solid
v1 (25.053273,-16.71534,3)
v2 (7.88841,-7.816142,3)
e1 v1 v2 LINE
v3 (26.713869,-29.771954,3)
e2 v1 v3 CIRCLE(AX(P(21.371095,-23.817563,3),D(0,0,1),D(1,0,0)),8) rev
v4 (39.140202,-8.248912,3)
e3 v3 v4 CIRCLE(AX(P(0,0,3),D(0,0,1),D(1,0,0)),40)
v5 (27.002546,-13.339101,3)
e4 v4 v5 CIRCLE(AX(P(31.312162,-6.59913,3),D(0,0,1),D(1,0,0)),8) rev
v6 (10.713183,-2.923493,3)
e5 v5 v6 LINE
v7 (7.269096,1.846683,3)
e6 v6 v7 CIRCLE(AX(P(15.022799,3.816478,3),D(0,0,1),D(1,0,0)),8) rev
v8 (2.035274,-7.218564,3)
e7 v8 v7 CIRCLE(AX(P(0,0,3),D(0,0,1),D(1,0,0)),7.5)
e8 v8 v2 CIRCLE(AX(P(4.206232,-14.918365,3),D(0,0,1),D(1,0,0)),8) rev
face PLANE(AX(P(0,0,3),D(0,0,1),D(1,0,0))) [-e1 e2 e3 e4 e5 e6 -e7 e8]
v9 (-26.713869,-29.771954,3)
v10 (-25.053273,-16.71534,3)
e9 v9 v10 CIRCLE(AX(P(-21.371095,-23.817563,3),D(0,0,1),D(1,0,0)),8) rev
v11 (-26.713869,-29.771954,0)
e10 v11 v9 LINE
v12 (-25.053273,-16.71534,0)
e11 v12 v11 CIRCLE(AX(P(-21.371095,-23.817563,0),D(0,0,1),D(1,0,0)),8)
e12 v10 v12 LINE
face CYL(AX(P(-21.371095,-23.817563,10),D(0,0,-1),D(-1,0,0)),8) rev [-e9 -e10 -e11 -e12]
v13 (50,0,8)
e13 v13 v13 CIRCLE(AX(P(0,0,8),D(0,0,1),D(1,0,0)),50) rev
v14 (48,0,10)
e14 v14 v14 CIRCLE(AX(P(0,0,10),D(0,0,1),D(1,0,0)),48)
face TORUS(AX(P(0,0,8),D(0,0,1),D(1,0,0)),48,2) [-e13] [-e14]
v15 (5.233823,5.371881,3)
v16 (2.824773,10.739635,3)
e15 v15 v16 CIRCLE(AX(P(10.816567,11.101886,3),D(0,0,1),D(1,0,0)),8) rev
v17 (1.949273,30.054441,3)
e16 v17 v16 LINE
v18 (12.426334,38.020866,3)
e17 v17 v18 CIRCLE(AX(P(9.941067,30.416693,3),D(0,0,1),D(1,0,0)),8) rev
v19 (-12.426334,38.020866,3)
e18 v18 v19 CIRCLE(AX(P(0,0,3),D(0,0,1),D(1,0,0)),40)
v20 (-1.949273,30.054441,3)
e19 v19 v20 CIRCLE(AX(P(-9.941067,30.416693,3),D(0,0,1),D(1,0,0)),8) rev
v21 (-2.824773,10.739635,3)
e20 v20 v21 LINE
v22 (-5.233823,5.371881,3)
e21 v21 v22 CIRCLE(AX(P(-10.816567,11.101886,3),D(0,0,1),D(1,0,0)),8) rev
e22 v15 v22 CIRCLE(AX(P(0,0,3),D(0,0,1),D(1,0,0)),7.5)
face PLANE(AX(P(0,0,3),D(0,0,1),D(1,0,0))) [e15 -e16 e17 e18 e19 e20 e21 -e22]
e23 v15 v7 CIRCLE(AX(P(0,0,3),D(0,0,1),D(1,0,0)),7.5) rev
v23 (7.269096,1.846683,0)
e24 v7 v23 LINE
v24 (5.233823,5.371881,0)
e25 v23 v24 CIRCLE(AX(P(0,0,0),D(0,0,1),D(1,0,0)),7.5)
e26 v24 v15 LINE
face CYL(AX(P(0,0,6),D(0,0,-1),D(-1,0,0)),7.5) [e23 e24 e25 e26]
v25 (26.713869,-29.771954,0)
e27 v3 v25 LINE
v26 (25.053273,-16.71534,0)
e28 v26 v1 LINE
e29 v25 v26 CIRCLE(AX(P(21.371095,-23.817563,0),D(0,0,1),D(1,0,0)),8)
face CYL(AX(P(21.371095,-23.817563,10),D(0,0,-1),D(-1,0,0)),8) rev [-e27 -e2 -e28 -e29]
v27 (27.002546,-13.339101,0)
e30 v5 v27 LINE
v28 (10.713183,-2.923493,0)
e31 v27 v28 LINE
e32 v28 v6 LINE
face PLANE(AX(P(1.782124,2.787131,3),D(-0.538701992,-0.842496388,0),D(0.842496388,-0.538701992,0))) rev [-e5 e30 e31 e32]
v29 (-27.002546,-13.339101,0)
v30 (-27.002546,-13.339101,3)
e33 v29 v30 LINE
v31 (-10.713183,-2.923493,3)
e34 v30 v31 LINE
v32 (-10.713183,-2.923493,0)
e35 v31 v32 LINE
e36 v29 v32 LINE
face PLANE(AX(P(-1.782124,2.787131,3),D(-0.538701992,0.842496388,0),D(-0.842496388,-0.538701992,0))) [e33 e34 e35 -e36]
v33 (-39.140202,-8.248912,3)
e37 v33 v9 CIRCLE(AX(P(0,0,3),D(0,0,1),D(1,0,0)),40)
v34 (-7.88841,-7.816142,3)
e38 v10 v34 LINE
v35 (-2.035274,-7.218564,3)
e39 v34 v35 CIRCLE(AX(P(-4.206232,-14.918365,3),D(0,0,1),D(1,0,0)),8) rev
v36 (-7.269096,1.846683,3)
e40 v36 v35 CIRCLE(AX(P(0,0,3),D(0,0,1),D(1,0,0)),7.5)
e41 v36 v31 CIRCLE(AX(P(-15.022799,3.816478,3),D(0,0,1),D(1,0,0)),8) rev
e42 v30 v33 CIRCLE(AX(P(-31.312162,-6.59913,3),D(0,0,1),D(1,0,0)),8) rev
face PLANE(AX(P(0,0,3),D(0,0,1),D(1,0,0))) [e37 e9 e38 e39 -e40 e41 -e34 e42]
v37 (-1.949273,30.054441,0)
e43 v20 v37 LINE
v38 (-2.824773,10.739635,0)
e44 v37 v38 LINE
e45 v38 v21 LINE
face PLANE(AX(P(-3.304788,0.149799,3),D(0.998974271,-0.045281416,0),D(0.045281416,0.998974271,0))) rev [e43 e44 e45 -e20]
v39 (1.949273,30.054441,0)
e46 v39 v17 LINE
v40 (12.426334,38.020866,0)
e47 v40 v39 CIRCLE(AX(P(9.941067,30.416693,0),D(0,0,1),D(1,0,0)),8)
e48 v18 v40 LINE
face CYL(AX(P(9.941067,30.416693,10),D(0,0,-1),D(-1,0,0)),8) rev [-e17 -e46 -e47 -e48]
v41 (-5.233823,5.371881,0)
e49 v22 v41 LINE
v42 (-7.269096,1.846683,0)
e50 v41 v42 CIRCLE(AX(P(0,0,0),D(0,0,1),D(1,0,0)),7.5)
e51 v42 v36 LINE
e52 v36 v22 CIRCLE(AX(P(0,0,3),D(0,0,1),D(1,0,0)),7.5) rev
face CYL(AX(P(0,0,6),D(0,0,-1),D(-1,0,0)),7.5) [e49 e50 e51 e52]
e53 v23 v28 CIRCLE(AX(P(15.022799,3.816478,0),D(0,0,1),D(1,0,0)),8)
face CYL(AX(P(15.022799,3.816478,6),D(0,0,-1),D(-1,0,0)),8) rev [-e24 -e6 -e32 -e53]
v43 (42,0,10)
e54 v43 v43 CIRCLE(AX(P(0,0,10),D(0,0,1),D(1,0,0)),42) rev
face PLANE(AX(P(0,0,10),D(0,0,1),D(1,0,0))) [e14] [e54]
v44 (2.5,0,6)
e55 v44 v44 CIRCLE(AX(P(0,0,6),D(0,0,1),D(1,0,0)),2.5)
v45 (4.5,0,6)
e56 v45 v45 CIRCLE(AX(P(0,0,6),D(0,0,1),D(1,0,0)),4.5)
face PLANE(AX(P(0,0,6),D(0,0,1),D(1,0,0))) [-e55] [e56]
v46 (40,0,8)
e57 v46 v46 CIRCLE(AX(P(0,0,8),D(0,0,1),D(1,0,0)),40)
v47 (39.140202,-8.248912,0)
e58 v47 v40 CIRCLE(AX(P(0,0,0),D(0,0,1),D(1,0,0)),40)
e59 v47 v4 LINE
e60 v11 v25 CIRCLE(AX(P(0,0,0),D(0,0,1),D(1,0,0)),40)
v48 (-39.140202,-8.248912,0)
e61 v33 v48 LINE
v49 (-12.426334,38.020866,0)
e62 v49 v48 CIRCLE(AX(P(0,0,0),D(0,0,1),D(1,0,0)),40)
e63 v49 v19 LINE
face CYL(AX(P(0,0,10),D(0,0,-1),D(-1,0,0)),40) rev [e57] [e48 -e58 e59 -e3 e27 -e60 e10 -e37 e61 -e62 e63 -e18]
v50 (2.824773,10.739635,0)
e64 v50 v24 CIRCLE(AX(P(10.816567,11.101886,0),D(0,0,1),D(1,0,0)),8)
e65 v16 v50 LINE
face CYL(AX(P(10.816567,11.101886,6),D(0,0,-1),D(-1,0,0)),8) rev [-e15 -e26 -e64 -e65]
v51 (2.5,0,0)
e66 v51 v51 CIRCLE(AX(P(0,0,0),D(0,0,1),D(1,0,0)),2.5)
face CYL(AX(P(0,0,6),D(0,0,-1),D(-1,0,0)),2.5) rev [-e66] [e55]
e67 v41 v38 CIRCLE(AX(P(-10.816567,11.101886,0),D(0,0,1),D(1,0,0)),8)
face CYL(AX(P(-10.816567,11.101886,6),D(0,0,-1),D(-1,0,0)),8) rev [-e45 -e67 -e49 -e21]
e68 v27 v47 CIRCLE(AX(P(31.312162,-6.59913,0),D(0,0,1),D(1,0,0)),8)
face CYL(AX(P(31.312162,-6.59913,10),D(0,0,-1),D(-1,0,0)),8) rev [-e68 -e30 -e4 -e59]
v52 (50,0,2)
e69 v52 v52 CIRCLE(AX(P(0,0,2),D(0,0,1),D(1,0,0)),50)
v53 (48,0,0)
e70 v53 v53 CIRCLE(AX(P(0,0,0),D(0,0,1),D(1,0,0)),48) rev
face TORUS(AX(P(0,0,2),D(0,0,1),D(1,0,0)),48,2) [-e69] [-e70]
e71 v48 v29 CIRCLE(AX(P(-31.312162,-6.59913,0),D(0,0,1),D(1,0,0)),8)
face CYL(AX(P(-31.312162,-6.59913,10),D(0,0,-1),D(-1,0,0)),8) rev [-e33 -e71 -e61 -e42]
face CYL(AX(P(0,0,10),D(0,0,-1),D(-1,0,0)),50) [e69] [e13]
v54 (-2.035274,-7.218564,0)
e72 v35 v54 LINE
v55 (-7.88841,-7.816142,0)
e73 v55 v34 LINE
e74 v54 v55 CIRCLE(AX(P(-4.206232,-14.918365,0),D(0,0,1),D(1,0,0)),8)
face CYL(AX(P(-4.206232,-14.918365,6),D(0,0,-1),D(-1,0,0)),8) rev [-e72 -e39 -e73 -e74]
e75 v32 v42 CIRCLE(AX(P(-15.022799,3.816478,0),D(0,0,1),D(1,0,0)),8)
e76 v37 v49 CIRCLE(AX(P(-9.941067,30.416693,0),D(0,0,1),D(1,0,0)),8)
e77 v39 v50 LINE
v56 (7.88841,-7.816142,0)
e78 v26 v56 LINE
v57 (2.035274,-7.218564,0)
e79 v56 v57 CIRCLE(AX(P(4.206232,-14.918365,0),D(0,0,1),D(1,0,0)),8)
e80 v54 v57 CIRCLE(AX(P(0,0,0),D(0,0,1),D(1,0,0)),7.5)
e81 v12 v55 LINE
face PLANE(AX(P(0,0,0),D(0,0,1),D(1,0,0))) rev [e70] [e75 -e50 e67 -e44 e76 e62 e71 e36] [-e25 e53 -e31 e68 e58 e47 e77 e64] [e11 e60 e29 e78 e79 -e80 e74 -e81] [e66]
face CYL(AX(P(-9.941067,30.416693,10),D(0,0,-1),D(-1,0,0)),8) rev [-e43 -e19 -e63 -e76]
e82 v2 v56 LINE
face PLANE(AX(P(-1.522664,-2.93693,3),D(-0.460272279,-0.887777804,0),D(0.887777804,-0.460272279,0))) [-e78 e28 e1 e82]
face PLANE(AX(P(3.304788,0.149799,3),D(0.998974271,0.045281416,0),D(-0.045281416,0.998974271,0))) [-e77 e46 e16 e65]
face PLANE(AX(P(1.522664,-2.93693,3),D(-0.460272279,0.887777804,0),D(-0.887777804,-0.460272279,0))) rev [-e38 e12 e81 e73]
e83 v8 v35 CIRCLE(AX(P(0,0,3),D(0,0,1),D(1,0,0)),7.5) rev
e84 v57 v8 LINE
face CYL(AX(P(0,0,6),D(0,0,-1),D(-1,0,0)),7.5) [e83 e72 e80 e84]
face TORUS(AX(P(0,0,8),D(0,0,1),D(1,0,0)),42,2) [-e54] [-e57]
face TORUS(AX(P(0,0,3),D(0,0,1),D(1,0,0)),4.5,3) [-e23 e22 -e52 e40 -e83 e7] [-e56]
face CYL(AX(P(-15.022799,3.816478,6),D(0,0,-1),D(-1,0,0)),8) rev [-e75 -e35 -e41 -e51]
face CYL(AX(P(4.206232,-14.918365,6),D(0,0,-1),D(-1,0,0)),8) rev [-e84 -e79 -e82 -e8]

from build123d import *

# Parameters (mm, degrees)
SKETCH1_R           = 50
SKETCH1_R_2         = 40
EXTRUDE_THIN1_DEPTH = 10
SKETCH2_R           = 7.5
SKETCH2_R_2         = 2.5
BOSS_EXTRUDE1_DEPTH = 6
BOSS_EXTRUDE4_DEPTH = 3
FILLET4_R           = 8
FILLET2_R           = 3
FILLET3_R           = 2


# Some blends are built 0.0001 mm under size
with BuildPart() as part:
    # Sketch1 → Extrude-Thin1 (new body)
    with BuildSketch(Plane.XY):
        Circle(SKETCH1_R)
        Circle(SKETCH1_R_2, mode=Mode.SUBTRACT)
    extrude(amount=EXTRUDE_THIN1_DEPTH)



with BuildPart() as body_2:
    # Sketch2 → Boss-Extrude1 (new body)
    with BuildSketch(Plane.XY):
        Circle(SKETCH2_R)
        Circle(SKETCH2_R_2, mode=Mode.SUBTRACT)
    extrude(amount=BOSS_EXTRUDE1_DEPTH)


with BuildPart() as part_1:
    add(part.part)

    add(body_2.part)  # Boss-Extrude4 merges body 2
    # Sketch3 → Boss-Extrude4 (add)
    with BuildSketch(Plane.XY):
        with BuildLine():
            ThreePointArc((-3, 6.873863542), (-1.532322328, 7.341797347), (0, 7.5))
            Line((0, 7.5), (0, 40))
            ThreePointArc((0, 40), (-0.75, 39.992968132), (-1.499736305, 39.971875))
            Line((-1.499736305, 39.971875), (-3, 6.873863542))
        make_face()
        with BuildLine():
            Line((0, 40), (0, 7.5))
            ThreePointArc((0, 7.5), (1.532322328, 7.341797347), (3, 6.873863542))
            Line((3, 6.873863542), (1.499736305, 39.971875))
            ThreePointArc((1.499736305, 39.971875), (0.75, 39.992968132), (0, 40))
        make_face()
        with BuildLine():
            Line((4.45294045, -6.035007983), (33.866791034, -21.284747239))
            ThreePointArc((33.866791034, -21.284747239), (34.641016151, -20), (35.366527339, -18.687127761))
            Line((35.366527339, -18.687127761), (7.45294045, -0.83885556))
            ThreePointArc((7.45294045, -0.83885556), (6.495190528, -3.75), (4.45294045, -6.035007983))
        make_face()
        with BuildLine():
            ThreePointArc((-35.366527339, -18.687127761), (-34.641016151, -20), (-33.866791034, -21.284747239))
            Line((-33.866791034, -21.284747239), (-4.45294045, -6.035007983))
            ThreePointArc((-4.45294045, -6.035007983), (-6.495190528, -3.75), (-7.45294045, -0.83885556))
            Line((-7.45294045, -0.83885556), (-35.366527339, -18.687127761))
        make_face()
    extrude(amount=BOSS_EXTRUDE4_DEPTH)

    # Fillet4
    # the kernel refuses this fillet: 8 mm, written as the material it adds along each edge
    with BuildSketch(Plane(origin=(-3, 6.873863542, 0), x_dir=(-0.829854636614874, -0.5579796430774114, 0), z_dir=(0, 0, 1)), Plane(origin=(7.45294045, -0.83885556, 0), x_dir=(-0.06829722739215581, 0.9976650182954919, 0), z_dir=(0, 0, 1)), Plane(origin=(-4.45294045, -6.035007983, 0), x_dir=(0.8981518640070405, -0.43968537521809675, 0), z_dir=(0, 0, 1))) as fillet4_piece_1:
        with BuildLine():
            CenterArc((4.127463516, -7.870129559), FILLET4_R, 100.338012957, 43.150474146)
            Line((-2.302435059, -3.110255158), (0, 0))
            ThreePointArc((0, 0), (1.345912016, -0.121753539), (2.691824032, 0))
        make_face()
    extrude(amount=3)
    with BuildSketch(Plane(origin=(3, 6.873863542, 0), x_dir=(0.8298546366148741, -0.5579796430774113, 0), z_dir=(0, 0, 1)), Plane(origin=(4.45294045, -6.035007983, 0), x_dir=(-0.8981518640070573, -0.4396853752180626, 0), z_dir=(0, 0, 1)), Plane(origin=(-7.45294045, -0.83885556, 0), x_dir=(0.06829722739219261, 0.9976650182954894, 0), z_dir=(0, 0, 1))) as fillet4_piece_2:
        with BuildLine():
            CenterArc((4.127463516, 7.870129559), FILLET4_R, 216.511512897, 43.150474146)
            Line((-2.302435059, 3.110255158), (0, 0))
            ThreePointArc((0, 0), (1.345912016, 0.121753539), (2.691824032, 0))
        make_face()
    extrude(amount=3)
    with BuildSketch(Plane(origin=(1.499736305, 39.971875, 0), x_dir=(0.04528141614846467, -0.9989742706154096, 0), z_dir=(0, 0, 1)), Plane(origin=(33.866791034, -21.284747239, 0), x_dir=(-0.8877778041541985, 0.46027227860381686, 0), z_dir=(0, 0, 1)), Plane(origin=(-35.366527339, -18.687127761, 0), x_dir=(0.8424963880057403, 0.5387019920116138, 0), z_dir=(0, 0, 1))) as fillet4_piece_3:
        with BuildLine():
            CenterArc((9.927616813, 8), FILLET4_R, 159.305768692, 110.694231308)
            ThreePointArc((2.443779894, 10.827045272), (0.84452181, 5.49869866), (0, 0))
            Line((0, 0), (9.927616813, 0))
        make_face()
    extrude(amount=3)
    with BuildSketch(Plane(origin=(-1.499736305, 39.971875, 0), x_dir=(-0.04528141614846486, -0.9989742706154096, 0), z_dir=(0, 0, 1)), Plane(origin=(35.366527339, -18.687127761, 0), x_dir=(-0.8424963880057321, 0.5387019920116268, 0), z_dir=(0, 0, 1)), Plane(origin=(-33.866791034, -21.284747239, 0), x_dir=(0.8877778041542049, 0.4602722786038045, 0), z_dir=(0, 0, 1))) as fillet4_piece_4:
        with BuildLine():
            CenterArc((9.927616813, -8), FILLET4_R, 90, 110.694231308)
            ThreePointArc((2.443779894, -10.827045272), (0.84452181, -5.49869866), (0, 0))
            Line((0, 0), (9.927616813, 0))
        make_face()
    extrude(amount=3)

    # Fillet2
    fillet2_edges = [part_1.edges().sort_by_distance(p)[0] for p in [
        (-7.5, 0, 6),
    ]]
    fillet(fillet2_edges, radius=FILLET2_R - 0.0001)  # a hair under: the kernel refuses the full size

    # Fillet3
    fillet3_edges = [part_1.edges().sort_by_distance(p)[0] for p in [
        (-50, 0, 0),
        (-50, 0, 10),
        (-40, 0, 10),
    ]]
    fillet(fillet3_edges, radius=FILLET3_R)


solid = part_1.part
